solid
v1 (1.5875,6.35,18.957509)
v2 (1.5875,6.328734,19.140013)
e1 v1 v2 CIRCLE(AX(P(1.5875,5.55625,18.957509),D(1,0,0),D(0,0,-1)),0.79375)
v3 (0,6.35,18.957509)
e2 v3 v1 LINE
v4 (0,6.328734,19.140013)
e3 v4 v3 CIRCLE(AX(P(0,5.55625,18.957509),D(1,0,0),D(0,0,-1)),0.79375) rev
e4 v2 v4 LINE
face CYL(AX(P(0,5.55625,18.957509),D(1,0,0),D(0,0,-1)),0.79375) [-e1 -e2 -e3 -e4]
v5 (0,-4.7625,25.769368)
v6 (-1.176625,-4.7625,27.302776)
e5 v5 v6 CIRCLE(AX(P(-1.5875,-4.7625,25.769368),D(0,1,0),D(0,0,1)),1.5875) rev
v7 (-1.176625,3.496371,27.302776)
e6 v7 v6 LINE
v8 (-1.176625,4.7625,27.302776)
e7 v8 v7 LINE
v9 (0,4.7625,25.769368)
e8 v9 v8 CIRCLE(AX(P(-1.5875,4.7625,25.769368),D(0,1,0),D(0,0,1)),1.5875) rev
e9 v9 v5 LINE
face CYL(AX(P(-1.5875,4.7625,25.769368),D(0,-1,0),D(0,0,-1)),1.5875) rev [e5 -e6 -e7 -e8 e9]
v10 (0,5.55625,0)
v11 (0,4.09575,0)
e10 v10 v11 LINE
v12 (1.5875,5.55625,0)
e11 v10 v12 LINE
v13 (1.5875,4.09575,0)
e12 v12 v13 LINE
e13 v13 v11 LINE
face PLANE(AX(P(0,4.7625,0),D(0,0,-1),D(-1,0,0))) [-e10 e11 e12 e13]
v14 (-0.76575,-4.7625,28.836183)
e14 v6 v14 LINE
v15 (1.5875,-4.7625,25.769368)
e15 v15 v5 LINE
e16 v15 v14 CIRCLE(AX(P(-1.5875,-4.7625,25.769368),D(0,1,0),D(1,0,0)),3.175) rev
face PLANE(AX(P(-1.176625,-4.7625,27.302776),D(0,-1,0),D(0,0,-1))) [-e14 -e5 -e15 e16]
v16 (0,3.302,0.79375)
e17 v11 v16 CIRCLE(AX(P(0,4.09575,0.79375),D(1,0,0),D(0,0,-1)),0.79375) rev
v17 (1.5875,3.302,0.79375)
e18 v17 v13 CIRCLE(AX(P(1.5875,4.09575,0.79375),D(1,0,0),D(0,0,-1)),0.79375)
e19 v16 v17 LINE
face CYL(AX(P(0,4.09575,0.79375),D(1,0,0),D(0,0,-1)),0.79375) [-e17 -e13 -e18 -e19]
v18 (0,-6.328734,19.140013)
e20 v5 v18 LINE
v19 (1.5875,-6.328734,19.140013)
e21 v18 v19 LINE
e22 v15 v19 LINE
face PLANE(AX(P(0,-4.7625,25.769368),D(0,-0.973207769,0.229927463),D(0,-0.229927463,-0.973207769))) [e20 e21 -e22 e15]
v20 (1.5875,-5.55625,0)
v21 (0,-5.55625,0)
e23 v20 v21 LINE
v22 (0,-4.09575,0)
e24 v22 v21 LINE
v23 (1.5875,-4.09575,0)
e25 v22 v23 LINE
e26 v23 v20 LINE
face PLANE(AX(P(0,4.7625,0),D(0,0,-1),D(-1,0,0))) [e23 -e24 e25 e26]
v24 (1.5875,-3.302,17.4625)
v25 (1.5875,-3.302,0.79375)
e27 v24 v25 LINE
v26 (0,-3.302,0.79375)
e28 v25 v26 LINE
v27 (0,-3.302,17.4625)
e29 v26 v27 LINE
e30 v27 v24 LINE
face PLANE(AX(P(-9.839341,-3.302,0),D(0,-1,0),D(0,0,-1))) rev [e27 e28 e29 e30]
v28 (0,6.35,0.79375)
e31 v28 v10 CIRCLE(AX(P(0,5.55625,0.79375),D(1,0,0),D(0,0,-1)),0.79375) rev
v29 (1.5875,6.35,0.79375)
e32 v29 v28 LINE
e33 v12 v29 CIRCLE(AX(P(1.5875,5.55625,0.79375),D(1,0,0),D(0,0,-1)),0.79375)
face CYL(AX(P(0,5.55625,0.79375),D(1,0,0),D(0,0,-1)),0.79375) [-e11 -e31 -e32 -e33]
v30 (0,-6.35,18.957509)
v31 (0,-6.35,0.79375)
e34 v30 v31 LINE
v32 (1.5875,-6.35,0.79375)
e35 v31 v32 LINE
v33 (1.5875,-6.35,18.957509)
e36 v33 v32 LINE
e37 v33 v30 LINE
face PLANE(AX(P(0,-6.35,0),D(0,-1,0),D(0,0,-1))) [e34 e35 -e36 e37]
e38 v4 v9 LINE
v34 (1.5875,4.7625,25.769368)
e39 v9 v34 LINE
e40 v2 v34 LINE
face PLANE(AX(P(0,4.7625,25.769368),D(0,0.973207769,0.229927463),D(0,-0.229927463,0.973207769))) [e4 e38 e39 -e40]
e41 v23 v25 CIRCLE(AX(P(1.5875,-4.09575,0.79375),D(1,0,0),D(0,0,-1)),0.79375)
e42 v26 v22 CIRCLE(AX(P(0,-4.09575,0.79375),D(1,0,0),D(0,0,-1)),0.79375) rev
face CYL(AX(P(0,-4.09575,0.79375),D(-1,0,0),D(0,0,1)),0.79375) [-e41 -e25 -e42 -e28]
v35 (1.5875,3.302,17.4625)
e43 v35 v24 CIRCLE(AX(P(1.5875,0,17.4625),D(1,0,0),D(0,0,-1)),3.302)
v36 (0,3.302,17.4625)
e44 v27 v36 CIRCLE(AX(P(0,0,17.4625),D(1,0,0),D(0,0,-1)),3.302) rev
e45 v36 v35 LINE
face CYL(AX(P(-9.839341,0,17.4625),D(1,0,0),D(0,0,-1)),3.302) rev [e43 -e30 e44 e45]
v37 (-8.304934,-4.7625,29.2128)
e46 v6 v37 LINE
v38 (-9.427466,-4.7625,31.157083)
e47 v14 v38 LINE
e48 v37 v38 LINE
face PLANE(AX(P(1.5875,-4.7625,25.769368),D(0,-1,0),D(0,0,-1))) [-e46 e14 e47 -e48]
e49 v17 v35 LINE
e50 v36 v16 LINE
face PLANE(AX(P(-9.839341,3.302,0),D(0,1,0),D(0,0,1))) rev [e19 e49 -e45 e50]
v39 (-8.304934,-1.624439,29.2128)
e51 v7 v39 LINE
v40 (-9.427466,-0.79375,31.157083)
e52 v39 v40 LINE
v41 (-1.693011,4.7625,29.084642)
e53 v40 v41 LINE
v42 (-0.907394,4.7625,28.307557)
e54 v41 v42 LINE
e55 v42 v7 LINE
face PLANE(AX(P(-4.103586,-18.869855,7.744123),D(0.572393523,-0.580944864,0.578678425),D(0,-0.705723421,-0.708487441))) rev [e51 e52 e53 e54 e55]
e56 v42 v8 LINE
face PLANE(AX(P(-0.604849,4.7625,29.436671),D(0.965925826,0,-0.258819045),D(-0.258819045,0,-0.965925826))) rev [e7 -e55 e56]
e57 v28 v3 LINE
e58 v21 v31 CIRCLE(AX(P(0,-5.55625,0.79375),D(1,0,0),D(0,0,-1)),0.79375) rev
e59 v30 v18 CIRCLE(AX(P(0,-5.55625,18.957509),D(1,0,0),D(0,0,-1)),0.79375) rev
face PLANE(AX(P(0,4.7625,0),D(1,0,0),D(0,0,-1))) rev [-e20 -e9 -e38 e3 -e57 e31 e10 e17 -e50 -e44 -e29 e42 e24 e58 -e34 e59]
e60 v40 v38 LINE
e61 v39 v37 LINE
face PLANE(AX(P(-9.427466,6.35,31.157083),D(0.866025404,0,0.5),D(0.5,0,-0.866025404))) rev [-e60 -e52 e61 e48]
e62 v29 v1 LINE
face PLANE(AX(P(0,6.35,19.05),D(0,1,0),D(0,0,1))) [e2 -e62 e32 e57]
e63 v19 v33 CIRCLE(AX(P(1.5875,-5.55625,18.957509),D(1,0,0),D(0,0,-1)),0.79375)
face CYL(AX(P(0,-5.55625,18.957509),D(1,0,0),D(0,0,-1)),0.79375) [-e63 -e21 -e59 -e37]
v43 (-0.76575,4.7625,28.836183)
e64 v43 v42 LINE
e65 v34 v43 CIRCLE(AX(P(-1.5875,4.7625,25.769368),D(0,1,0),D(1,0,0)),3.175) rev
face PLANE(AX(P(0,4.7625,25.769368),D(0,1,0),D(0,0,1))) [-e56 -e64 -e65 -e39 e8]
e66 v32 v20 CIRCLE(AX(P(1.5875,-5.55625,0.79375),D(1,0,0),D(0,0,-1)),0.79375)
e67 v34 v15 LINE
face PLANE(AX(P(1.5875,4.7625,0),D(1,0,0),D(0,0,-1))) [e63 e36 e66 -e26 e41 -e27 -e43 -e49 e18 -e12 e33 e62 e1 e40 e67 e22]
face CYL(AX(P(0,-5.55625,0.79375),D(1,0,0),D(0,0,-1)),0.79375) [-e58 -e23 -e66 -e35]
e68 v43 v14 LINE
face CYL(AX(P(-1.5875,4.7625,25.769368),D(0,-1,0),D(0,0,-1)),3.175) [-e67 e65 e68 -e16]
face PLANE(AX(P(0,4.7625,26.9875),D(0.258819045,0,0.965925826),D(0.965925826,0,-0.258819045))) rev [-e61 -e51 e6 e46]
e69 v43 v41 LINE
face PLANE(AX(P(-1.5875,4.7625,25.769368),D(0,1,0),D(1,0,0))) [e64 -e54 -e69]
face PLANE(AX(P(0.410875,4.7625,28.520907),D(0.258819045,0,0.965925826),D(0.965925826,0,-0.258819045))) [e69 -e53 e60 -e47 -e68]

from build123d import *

# Parameters (mm, degrees)
BASE_FLANGE1_DEPTH  = 4.7625
CUT_EXTRUDE2_DEPTH  = 33.017769542
CUT_EXTRUDE3_REACH  = 35.526
TAB1_DEPTH          = 1.5875
BREAK_CORNER1_DEPTH = 1.5875
CUT_EXTRUDE7_REACH  = 32.474
SKETCH10_W          = 10.847778963
SKETCH10_H          = 1.122532015
CUT_EXTRUDE8_DEPTH  = 7.9375
CUT_EXTRUDE9_REACH  = 32.812
CUT_EXTRUDE4_DEPTH  = 35.511511322


# Read off the part's stored shape, not the designer's step: Break-Corner1
# Sheet-metal steps are written as plain solids
with BuildPart() as part:
    # Sketch1 → Base-Flange1 (new, symmetric)
    with BuildSketch(Plane(origin=(0, 0, 0), x_dir=(1, 0, 0), z_dir=(0, 1, 0))):
        with BuildLine():
            Line((0, 0), (0, -25.769368407))
            ThreePointArc((0, -25.769368407), (-0.328051572, -26.735777175), (-1.176624766, -27.302775656))
            Line((-1.176624766, -27.302775656), (-9.838340911, -29.623675502))
            Line((-9.838340911, -29.623675502), (-9.427465677, -31.157082751))
            Line((-9.427465677, -31.157082751), (-0.765749532, -28.836182905))
            ThreePointArc((-0.765749532, -28.836182905), (0.931396855, -27.702185944), (1.5875, -25.769368407))
            Line((1.5875, -25.769368407), (1.5875, 0))
            Line((1.5875, 0), (0, 0))
        make_face()
    extrude(amount=BASE_FLANGE1_DEPTH, both=True)

    # Sketch4 → Cut-Extrude2 (cut, through all)
    with BuildSketch(Plane(origin=(7.157750234, 0, 26.713087542), x_dir=(0.9659258262890691, 0, -0.2588190451025182), z_dir=(0.2588190451025182, 0, 0.9659258262890691))):
        Polygon((-17.17027898, 4.7625), (-17.17027898, -0.79375), (-9.162982379, 4.7625), align=None)
    extrude(amount=-CUT_EXTRUDE2_DEPTH, mode=Mode.SUBTRACT)

    # Sketch5 → Cut-Extrude3 (cut, up to next)
    with BuildSketch(Plane(origin=(1.5875, 0, 0), x_dir=(0, 0, -1), z_dir=(1, 0, 0)), mode=Mode.PRIVATE) as cut_extrude3_sk1:
        with BuildLine():
            Line((0, -3.302), (-17.4625, -3.302))
            ThreePointArc((-17.4625, -3.302), (-20.7645, 0), (-17.4625, 3.302))
            Line((-17.4625, 3.302), (0, 3.302))
            ThreePointArc((0, 3.302), (3.302, 0), (0, -3.302))
        make_face()
    cut_extrude3_tool1 = extrude(cut_extrude3_sk1.sketch, amount=-CUT_EXTRUDE3_REACH, mode=Mode.PRIVATE) & part.part
    add(cut_extrude3_tool1.solids().sort_by_distance((1.5875, 0, 8.73125))[0], mode=Mode.SUBTRACT)

    # Sketch6 → Tab1 (add)
    with BuildSketch(Plane(origin=(1.5875, 0, 0), x_dir=(0, 0, -1), z_dir=(1, 0, 0))):
        Polygon((-25.769368407, 4.7625), (0, 4.7625), (0, 6.35), (-19.05, 6.35), align=None)
        Polygon((0, -4.7625), (-25.769368407, -4.7625), (-19.05, -6.35), (0, -6.35), align=None)
    extrude(amount=-TAB1_DEPTH)

    # Break-Corner1 outline → Break-Corner1 (cut)
    with BuildSketch(Plane.YZ):
        with BuildLine():
            ThreePointArc((-3.302, 0.79375), (-3.534483992, 0.232483992), (-4.09575, 0))
            Line((-4.09575, 0), (-3.302, 0))
            Line((-3.302, 0), (-3.302, 0.79375))
        make_face()
        with BuildLine():
            ThreePointArc((-5.55625, 0), (-6.117516008, 0.232483992), (-6.35, 0.79375))
            Line((-6.35, 0.79375), (-6.35, 0))
            Line((-6.35, 0), (-5.55625, 0))
        make_face()
        with BuildLine():
            ThreePointArc((-6.35, 18.957508511), (-6.344665491, 19.049378398), (-6.328733667, 19.140013435))
            Line((-6.328733667, 19.140013435), (-6.35, 19.05))
            Line((-6.35, 19.05), (-6.35, 18.957508511))
        make_face()
        with BuildLine():
            Line((3.302, 0), (4.09575, 0))
            ThreePointArc((4.09575, 0), (3.534483992, 0.232483992), (3.302, 0.79375))
            Line((3.302, 0.79375), (3.302, 0))
        make_face()
        with BuildLine():
            Line((6.35, 0), (6.35, 0.79375))
            ThreePointArc((6.35, 0.79375), (6.117516008, 0.232483992), (5.55625, 0))
            Line((5.55625, 0), (6.35, 0))
        make_face()
        with BuildLine():
            ThreePointArc((6.328733667, 19.140013435), (6.344665491, 19.049378398), (6.35, 18.957508511))
            Line((6.35, 18.957508511), (6.35, 19.05))
            Line((6.35, 19.05), (6.328733667, 19.140013435))
        make_face()
    extrude(amount=BREAK_CORNER1_DEPTH, mode=Mode.SUBTRACT)

    # Cut-Extrude7: up to this plane
    cut_extrude7_end = Plane(origin=(0, 4.7625, 26.9875), z_dir=(0.25881904510251813, 0, 0.965925826289069))
    # Sketch10 → Cut-Extrude7 (cut, up to the surface)
    with BuildSketch(Plane(origin=(-5.368839639, 15.113767658, 20.483491715), x_dir=(0.7935854418944778, 0.5700930896630726, -0.21264057828071875), z_dir=(-0.20636811960864032, 0.5809448636137555, 0.7873469785615419)), mode=Mode.PRIVATE) as cut_extrude7_sk1:
        with Locations((-10.236945168, -12.533570263)):
            Rectangle(SKETCH10_W, SKETCH10_H)
    cut_extrude7_tool1 = split(extrude(cut_extrude7_sk1.sketch, amount=-CUT_EXTRUDE7_REACH, mode=Mode.PRIVATE), bisect_by=cut_extrude7_end, keep=Keep.BOTH, mode=Mode.PRIVATE)
    add(cut_extrude7_tool1.solids().sort_by_distance((-6.318596, 1.996443, 29.913188))[0], mode=Mode.SUBTRACT)

    # Sketch11 → Cut-Extrude8 (cut)
    with BuildSketch(Plane(origin=(7.495399471, -7.607377871, 7.577699232), x_dir=(0.819979057279916, 0.40553362238795987, -0.4039515153273222), z_dir=(-0.5723935233930764, 0.5809448636137574, -0.5786784252228975))):
        Polygon((-10.640638737, -21.79431173), (-10.575909421, -21.81114428), (-10.249235129, -23.422955447), (-10.344964483, -23.791081213), (-11.205664927, -23.967111285), align=None)
    extrude(amount=CUT_EXTRUDE8_DEPTH, mode=Mode.SUBTRACT)

    # Cut-Extrude9: up to this face of the body (flat: up to its plane)
    cut_extrude9_end = Plane(part.part.faces().sort_by_distance((-5.381060773, 1.282704756, 29.23921233))[0])
    # Sketch12 → Cut-Extrude9 (cut, up to the picked face)
    with BuildSketch(Plane(origin=(6.746875, 0, 25.179680292), x_dir=(-0.9659258262890691, 0, 0.25881904510251813), z_dir=(-0.25881904510251813, 0, -0.9659258262890691)), mode=Mode.PRIVATE) as cut_extrude9_sk1:
        Polygon((8.558950337, 4.7625), (8.203010573, 3.496370622), (8.203010573, 4.7625), align=None)
    cut_extrude9_tool1 = split(extrude(cut_extrude9_sk1.sketch, amount=-CUT_EXTRUDE9_REACH, mode=Mode.PRIVATE), bisect_by=cut_extrude9_end, keep=Keep.BOTH, mode=Mode.PRIVATE)
    add(cut_extrude9_tool1.solids().sort_by(Axis((-1.291229, 4.340457, 27.333484), (0.25881904510251813, 0, 0.9659258262890691)))[0], mode=Mode.SUBTRACT)

    # Sketch7 → Cut-Extrude4 (cut, through all)
    with BuildSketch(Plane.XZ.offset(4.7625)):
        Polygon((-9.427465677, 31.157082751), (-8.304933662, 29.212800268), (-9.838340911, 29.623675502), align=None)
    extrude(amount=-CUT_EXTRUDE4_DEPTH, mode=Mode.SUBTRACT)


solid = part.part
